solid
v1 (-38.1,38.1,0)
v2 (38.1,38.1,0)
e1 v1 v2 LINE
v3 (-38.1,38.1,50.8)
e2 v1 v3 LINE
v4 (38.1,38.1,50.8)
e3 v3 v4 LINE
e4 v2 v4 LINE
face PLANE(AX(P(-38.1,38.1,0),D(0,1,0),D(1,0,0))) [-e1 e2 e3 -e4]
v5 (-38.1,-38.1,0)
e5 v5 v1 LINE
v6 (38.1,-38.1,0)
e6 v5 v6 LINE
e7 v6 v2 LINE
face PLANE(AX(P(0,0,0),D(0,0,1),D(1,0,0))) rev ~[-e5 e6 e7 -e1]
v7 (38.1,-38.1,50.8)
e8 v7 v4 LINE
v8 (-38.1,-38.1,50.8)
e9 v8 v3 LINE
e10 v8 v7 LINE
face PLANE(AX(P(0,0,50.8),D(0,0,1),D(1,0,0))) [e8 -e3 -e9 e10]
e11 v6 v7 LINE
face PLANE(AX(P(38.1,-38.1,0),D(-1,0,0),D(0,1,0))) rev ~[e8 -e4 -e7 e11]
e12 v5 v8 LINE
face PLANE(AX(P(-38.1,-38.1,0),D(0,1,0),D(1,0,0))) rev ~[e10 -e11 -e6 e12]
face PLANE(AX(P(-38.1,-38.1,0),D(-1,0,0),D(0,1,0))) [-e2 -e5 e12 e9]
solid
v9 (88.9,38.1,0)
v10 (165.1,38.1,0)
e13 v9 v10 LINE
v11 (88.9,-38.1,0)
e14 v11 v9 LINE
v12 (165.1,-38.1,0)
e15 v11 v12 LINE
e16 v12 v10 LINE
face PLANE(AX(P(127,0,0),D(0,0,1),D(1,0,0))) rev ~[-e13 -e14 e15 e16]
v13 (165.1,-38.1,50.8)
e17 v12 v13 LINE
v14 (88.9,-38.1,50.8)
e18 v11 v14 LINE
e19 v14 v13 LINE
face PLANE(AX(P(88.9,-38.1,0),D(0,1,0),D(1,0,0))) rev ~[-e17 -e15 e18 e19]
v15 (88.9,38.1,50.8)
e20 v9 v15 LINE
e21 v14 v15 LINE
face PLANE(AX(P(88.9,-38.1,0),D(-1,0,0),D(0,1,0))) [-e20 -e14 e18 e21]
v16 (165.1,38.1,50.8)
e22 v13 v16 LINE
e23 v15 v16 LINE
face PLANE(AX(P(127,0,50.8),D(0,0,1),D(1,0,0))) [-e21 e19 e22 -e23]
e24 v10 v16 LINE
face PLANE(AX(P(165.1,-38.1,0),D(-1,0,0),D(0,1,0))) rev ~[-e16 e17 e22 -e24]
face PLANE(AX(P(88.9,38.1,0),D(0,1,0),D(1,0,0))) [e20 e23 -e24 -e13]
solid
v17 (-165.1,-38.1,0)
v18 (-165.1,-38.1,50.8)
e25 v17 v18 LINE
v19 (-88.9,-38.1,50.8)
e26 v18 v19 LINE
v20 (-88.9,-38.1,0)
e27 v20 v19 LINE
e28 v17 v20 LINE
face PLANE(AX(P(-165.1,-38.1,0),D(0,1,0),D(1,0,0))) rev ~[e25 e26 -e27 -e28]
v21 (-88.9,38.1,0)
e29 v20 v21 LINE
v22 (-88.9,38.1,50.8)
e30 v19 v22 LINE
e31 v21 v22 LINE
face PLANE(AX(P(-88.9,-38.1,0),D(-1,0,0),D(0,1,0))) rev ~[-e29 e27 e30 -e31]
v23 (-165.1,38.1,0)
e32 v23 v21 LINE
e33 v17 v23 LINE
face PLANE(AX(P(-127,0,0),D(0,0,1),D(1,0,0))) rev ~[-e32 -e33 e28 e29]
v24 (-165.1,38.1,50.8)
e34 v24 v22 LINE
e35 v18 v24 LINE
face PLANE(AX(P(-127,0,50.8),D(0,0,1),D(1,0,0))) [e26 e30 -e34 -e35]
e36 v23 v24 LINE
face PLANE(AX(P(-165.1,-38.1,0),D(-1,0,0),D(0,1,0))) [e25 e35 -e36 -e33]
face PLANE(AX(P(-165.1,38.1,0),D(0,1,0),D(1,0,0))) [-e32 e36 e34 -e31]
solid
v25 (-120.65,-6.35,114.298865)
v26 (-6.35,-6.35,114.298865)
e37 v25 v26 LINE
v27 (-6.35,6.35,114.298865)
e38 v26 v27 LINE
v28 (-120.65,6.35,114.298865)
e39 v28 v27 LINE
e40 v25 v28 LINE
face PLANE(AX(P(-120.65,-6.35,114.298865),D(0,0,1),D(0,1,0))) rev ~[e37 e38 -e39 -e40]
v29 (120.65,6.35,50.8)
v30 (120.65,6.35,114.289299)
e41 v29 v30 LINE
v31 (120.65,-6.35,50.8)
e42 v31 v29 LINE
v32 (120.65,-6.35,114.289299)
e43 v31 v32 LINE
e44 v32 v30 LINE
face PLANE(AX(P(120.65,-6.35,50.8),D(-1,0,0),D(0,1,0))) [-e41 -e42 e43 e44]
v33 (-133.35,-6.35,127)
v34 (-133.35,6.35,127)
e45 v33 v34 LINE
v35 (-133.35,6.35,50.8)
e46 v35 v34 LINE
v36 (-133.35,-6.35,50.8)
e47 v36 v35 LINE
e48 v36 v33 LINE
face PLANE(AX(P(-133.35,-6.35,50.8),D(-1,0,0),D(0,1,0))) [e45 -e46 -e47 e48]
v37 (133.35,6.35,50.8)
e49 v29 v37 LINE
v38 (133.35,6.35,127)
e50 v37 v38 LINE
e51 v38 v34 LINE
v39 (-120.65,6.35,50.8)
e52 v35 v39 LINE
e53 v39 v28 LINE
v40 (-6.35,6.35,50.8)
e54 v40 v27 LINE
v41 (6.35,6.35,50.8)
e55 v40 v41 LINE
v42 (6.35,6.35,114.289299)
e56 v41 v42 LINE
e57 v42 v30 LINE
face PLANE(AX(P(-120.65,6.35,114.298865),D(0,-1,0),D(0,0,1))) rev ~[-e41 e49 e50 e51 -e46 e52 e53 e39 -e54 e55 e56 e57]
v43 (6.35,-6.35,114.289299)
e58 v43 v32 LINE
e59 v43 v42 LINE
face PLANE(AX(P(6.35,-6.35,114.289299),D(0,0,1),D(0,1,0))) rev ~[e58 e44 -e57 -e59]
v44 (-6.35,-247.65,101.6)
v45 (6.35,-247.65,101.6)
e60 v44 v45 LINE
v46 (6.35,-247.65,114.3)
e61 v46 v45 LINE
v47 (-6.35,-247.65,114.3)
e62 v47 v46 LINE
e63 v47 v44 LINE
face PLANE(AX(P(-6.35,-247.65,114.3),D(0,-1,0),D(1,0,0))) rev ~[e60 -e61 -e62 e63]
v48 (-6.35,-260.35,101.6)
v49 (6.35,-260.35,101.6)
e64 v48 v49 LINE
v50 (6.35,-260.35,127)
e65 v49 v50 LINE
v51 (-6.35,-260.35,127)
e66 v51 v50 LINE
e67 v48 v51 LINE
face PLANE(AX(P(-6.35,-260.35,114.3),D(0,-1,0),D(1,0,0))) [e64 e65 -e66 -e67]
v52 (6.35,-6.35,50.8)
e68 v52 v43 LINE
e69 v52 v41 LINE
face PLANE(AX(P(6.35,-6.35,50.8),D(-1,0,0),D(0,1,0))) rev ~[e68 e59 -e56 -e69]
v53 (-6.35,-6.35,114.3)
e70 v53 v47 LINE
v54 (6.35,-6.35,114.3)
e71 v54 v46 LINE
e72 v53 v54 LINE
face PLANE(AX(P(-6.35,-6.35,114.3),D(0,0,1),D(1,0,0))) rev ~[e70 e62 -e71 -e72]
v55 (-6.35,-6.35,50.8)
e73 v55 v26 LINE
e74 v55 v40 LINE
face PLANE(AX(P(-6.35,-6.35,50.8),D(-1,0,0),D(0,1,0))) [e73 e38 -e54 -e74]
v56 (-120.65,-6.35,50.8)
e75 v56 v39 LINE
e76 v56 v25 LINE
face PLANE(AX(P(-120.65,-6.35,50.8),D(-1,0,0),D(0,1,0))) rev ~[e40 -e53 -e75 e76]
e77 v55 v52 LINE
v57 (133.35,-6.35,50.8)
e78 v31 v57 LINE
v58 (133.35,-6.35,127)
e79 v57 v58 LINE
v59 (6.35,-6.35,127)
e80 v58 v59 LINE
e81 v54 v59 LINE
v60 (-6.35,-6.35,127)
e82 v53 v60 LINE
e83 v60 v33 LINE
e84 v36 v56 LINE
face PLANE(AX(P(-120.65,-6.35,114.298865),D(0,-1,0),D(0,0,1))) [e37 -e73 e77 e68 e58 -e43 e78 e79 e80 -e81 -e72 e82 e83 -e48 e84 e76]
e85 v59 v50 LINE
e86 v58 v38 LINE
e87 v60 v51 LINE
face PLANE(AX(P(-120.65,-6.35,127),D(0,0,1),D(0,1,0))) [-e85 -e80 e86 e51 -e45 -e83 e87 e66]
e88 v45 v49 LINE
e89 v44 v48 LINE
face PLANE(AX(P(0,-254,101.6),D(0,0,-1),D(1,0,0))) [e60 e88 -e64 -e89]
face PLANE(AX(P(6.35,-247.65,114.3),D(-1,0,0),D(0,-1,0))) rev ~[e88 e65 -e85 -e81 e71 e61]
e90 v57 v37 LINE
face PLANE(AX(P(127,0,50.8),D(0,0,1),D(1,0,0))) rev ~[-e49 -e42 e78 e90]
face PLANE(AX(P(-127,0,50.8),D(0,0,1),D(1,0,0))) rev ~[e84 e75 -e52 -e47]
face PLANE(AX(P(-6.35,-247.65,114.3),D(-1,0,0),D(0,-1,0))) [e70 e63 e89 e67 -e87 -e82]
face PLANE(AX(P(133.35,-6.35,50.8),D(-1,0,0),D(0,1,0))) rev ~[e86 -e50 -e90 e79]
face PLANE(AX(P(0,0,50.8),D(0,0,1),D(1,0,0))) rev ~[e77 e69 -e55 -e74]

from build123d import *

# Parameters (mm, degrees)
F0_W      = 76.2
F0_H      = 76.2
F1_DEPTH  = 50.8
F3_W      = 12.7
F3_H      = 12.7
F5_DEPTH  = 76.2
F2_W      = 12.7
F2_H      = 12.7
F4_W      = 12.7
F4_H      = 12.7
F7_W      = 12.7
F7_H      = 12.7107013464
F8_DEPTH  = 114.3
F6_W      = 12.7
F6_H      = 12.7011348009
F9_W      = 12.7
F9_H      = 12.7
F10_DEPTH = 254
F11_W     = 12.7
F11_H     = 12.7
F12_DEPTH = 12.7


with BuildPart() as f1:
    # F0 (on Top) → F1 (new body)
    with BuildSketch(Plane.XY):
        with Locations((-127, 0)):
            Rectangle(F0_W, F0_H)
    extrude(amount=F1_DEPTH)


with BuildPart() as f1b:
    # F0 (on Top) → F1, piece 2 (new body)
    with BuildSketch(Plane.XY):
        Rectangle(F0_W, F0_H)
    extrude(amount=F1_DEPTH)


with BuildPart() as f1c:
    # F0 (on Top) → F1, piece 3 (new body)
    with BuildSketch(Plane.XY):
        with Locations((127, 0)):
            Rectangle(F0_W, F0_H)
    extrude(amount=F1_DEPTH)


with BuildPart() as f5:
    # F3 (on face) → F5 (new body)
    with BuildSketch(Plane.XY.offset(50.8)):
        with Locations((-127, 0)):
            Rectangle(F3_W, F3_H)
    extrude(amount=F5_DEPTH)



with BuildPart() as f5b:
    # F2 (on face) → F5, piece 2 (new body)
    with BuildSketch(Plane.XY.offset(50.8)):
        Rectangle(F2_W, F2_H)
    extrude(amount=F5_DEPTH)



with BuildPart() as f5c:
    # F4 (on face) → F5, piece 3 (new body)
    with BuildSketch(Plane.XY.offset(50.8)):
        with Locations((127, 0)):
            Rectangle(F4_W, F4_H)
    extrude(amount=F5_DEPTH)


with BuildPart() as f5b_1:
    add(f5b.part)

    add(f5c.part)  # F8 merges F5c
    # F7 (on face) → F8 (join)
    with BuildSketch(Plane.YZ.offset(6.35)):
        with Locations((0, 120.6446493268)):
            Rectangle(F7_W, F7_H)
    extrude(amount=F8_DEPTH)


with BuildPart() as f5_1:
    add(f5.part)

    add(f5b_1.part)  # F8#2 merges F5b
    # F6 (on face) → F8, piece 2 (join)
    with BuildSketch(Plane.YZ.offset(-120.65)):
        with Locations((0, 120.6494325995)):
            Rectangle(F6_W, F6_H)
    extrude(amount=F8_DEPTH)

    # F9 (on face) → F10 (join)
    with BuildSketch(Plane.XZ.offset(6.35)):
        with Locations((0, 120.65)):
            Rectangle(F9_W, F9_H)
    extrude(amount=F10_DEPTH)

    # F11 (on face) → F12 (join)
    with BuildSketch(Plane(origin=(0, 0, 114.3), x_dir=(1, 0, 0), z_dir=(0, 0, -1))):
        with Locations((0, 254)):
            Rectangle(F11_W, F11_H)
    extrude(amount=F12_DEPTH)


solid = Compound([f1.part, f1b.part, f1c.part, f5_1.part])
